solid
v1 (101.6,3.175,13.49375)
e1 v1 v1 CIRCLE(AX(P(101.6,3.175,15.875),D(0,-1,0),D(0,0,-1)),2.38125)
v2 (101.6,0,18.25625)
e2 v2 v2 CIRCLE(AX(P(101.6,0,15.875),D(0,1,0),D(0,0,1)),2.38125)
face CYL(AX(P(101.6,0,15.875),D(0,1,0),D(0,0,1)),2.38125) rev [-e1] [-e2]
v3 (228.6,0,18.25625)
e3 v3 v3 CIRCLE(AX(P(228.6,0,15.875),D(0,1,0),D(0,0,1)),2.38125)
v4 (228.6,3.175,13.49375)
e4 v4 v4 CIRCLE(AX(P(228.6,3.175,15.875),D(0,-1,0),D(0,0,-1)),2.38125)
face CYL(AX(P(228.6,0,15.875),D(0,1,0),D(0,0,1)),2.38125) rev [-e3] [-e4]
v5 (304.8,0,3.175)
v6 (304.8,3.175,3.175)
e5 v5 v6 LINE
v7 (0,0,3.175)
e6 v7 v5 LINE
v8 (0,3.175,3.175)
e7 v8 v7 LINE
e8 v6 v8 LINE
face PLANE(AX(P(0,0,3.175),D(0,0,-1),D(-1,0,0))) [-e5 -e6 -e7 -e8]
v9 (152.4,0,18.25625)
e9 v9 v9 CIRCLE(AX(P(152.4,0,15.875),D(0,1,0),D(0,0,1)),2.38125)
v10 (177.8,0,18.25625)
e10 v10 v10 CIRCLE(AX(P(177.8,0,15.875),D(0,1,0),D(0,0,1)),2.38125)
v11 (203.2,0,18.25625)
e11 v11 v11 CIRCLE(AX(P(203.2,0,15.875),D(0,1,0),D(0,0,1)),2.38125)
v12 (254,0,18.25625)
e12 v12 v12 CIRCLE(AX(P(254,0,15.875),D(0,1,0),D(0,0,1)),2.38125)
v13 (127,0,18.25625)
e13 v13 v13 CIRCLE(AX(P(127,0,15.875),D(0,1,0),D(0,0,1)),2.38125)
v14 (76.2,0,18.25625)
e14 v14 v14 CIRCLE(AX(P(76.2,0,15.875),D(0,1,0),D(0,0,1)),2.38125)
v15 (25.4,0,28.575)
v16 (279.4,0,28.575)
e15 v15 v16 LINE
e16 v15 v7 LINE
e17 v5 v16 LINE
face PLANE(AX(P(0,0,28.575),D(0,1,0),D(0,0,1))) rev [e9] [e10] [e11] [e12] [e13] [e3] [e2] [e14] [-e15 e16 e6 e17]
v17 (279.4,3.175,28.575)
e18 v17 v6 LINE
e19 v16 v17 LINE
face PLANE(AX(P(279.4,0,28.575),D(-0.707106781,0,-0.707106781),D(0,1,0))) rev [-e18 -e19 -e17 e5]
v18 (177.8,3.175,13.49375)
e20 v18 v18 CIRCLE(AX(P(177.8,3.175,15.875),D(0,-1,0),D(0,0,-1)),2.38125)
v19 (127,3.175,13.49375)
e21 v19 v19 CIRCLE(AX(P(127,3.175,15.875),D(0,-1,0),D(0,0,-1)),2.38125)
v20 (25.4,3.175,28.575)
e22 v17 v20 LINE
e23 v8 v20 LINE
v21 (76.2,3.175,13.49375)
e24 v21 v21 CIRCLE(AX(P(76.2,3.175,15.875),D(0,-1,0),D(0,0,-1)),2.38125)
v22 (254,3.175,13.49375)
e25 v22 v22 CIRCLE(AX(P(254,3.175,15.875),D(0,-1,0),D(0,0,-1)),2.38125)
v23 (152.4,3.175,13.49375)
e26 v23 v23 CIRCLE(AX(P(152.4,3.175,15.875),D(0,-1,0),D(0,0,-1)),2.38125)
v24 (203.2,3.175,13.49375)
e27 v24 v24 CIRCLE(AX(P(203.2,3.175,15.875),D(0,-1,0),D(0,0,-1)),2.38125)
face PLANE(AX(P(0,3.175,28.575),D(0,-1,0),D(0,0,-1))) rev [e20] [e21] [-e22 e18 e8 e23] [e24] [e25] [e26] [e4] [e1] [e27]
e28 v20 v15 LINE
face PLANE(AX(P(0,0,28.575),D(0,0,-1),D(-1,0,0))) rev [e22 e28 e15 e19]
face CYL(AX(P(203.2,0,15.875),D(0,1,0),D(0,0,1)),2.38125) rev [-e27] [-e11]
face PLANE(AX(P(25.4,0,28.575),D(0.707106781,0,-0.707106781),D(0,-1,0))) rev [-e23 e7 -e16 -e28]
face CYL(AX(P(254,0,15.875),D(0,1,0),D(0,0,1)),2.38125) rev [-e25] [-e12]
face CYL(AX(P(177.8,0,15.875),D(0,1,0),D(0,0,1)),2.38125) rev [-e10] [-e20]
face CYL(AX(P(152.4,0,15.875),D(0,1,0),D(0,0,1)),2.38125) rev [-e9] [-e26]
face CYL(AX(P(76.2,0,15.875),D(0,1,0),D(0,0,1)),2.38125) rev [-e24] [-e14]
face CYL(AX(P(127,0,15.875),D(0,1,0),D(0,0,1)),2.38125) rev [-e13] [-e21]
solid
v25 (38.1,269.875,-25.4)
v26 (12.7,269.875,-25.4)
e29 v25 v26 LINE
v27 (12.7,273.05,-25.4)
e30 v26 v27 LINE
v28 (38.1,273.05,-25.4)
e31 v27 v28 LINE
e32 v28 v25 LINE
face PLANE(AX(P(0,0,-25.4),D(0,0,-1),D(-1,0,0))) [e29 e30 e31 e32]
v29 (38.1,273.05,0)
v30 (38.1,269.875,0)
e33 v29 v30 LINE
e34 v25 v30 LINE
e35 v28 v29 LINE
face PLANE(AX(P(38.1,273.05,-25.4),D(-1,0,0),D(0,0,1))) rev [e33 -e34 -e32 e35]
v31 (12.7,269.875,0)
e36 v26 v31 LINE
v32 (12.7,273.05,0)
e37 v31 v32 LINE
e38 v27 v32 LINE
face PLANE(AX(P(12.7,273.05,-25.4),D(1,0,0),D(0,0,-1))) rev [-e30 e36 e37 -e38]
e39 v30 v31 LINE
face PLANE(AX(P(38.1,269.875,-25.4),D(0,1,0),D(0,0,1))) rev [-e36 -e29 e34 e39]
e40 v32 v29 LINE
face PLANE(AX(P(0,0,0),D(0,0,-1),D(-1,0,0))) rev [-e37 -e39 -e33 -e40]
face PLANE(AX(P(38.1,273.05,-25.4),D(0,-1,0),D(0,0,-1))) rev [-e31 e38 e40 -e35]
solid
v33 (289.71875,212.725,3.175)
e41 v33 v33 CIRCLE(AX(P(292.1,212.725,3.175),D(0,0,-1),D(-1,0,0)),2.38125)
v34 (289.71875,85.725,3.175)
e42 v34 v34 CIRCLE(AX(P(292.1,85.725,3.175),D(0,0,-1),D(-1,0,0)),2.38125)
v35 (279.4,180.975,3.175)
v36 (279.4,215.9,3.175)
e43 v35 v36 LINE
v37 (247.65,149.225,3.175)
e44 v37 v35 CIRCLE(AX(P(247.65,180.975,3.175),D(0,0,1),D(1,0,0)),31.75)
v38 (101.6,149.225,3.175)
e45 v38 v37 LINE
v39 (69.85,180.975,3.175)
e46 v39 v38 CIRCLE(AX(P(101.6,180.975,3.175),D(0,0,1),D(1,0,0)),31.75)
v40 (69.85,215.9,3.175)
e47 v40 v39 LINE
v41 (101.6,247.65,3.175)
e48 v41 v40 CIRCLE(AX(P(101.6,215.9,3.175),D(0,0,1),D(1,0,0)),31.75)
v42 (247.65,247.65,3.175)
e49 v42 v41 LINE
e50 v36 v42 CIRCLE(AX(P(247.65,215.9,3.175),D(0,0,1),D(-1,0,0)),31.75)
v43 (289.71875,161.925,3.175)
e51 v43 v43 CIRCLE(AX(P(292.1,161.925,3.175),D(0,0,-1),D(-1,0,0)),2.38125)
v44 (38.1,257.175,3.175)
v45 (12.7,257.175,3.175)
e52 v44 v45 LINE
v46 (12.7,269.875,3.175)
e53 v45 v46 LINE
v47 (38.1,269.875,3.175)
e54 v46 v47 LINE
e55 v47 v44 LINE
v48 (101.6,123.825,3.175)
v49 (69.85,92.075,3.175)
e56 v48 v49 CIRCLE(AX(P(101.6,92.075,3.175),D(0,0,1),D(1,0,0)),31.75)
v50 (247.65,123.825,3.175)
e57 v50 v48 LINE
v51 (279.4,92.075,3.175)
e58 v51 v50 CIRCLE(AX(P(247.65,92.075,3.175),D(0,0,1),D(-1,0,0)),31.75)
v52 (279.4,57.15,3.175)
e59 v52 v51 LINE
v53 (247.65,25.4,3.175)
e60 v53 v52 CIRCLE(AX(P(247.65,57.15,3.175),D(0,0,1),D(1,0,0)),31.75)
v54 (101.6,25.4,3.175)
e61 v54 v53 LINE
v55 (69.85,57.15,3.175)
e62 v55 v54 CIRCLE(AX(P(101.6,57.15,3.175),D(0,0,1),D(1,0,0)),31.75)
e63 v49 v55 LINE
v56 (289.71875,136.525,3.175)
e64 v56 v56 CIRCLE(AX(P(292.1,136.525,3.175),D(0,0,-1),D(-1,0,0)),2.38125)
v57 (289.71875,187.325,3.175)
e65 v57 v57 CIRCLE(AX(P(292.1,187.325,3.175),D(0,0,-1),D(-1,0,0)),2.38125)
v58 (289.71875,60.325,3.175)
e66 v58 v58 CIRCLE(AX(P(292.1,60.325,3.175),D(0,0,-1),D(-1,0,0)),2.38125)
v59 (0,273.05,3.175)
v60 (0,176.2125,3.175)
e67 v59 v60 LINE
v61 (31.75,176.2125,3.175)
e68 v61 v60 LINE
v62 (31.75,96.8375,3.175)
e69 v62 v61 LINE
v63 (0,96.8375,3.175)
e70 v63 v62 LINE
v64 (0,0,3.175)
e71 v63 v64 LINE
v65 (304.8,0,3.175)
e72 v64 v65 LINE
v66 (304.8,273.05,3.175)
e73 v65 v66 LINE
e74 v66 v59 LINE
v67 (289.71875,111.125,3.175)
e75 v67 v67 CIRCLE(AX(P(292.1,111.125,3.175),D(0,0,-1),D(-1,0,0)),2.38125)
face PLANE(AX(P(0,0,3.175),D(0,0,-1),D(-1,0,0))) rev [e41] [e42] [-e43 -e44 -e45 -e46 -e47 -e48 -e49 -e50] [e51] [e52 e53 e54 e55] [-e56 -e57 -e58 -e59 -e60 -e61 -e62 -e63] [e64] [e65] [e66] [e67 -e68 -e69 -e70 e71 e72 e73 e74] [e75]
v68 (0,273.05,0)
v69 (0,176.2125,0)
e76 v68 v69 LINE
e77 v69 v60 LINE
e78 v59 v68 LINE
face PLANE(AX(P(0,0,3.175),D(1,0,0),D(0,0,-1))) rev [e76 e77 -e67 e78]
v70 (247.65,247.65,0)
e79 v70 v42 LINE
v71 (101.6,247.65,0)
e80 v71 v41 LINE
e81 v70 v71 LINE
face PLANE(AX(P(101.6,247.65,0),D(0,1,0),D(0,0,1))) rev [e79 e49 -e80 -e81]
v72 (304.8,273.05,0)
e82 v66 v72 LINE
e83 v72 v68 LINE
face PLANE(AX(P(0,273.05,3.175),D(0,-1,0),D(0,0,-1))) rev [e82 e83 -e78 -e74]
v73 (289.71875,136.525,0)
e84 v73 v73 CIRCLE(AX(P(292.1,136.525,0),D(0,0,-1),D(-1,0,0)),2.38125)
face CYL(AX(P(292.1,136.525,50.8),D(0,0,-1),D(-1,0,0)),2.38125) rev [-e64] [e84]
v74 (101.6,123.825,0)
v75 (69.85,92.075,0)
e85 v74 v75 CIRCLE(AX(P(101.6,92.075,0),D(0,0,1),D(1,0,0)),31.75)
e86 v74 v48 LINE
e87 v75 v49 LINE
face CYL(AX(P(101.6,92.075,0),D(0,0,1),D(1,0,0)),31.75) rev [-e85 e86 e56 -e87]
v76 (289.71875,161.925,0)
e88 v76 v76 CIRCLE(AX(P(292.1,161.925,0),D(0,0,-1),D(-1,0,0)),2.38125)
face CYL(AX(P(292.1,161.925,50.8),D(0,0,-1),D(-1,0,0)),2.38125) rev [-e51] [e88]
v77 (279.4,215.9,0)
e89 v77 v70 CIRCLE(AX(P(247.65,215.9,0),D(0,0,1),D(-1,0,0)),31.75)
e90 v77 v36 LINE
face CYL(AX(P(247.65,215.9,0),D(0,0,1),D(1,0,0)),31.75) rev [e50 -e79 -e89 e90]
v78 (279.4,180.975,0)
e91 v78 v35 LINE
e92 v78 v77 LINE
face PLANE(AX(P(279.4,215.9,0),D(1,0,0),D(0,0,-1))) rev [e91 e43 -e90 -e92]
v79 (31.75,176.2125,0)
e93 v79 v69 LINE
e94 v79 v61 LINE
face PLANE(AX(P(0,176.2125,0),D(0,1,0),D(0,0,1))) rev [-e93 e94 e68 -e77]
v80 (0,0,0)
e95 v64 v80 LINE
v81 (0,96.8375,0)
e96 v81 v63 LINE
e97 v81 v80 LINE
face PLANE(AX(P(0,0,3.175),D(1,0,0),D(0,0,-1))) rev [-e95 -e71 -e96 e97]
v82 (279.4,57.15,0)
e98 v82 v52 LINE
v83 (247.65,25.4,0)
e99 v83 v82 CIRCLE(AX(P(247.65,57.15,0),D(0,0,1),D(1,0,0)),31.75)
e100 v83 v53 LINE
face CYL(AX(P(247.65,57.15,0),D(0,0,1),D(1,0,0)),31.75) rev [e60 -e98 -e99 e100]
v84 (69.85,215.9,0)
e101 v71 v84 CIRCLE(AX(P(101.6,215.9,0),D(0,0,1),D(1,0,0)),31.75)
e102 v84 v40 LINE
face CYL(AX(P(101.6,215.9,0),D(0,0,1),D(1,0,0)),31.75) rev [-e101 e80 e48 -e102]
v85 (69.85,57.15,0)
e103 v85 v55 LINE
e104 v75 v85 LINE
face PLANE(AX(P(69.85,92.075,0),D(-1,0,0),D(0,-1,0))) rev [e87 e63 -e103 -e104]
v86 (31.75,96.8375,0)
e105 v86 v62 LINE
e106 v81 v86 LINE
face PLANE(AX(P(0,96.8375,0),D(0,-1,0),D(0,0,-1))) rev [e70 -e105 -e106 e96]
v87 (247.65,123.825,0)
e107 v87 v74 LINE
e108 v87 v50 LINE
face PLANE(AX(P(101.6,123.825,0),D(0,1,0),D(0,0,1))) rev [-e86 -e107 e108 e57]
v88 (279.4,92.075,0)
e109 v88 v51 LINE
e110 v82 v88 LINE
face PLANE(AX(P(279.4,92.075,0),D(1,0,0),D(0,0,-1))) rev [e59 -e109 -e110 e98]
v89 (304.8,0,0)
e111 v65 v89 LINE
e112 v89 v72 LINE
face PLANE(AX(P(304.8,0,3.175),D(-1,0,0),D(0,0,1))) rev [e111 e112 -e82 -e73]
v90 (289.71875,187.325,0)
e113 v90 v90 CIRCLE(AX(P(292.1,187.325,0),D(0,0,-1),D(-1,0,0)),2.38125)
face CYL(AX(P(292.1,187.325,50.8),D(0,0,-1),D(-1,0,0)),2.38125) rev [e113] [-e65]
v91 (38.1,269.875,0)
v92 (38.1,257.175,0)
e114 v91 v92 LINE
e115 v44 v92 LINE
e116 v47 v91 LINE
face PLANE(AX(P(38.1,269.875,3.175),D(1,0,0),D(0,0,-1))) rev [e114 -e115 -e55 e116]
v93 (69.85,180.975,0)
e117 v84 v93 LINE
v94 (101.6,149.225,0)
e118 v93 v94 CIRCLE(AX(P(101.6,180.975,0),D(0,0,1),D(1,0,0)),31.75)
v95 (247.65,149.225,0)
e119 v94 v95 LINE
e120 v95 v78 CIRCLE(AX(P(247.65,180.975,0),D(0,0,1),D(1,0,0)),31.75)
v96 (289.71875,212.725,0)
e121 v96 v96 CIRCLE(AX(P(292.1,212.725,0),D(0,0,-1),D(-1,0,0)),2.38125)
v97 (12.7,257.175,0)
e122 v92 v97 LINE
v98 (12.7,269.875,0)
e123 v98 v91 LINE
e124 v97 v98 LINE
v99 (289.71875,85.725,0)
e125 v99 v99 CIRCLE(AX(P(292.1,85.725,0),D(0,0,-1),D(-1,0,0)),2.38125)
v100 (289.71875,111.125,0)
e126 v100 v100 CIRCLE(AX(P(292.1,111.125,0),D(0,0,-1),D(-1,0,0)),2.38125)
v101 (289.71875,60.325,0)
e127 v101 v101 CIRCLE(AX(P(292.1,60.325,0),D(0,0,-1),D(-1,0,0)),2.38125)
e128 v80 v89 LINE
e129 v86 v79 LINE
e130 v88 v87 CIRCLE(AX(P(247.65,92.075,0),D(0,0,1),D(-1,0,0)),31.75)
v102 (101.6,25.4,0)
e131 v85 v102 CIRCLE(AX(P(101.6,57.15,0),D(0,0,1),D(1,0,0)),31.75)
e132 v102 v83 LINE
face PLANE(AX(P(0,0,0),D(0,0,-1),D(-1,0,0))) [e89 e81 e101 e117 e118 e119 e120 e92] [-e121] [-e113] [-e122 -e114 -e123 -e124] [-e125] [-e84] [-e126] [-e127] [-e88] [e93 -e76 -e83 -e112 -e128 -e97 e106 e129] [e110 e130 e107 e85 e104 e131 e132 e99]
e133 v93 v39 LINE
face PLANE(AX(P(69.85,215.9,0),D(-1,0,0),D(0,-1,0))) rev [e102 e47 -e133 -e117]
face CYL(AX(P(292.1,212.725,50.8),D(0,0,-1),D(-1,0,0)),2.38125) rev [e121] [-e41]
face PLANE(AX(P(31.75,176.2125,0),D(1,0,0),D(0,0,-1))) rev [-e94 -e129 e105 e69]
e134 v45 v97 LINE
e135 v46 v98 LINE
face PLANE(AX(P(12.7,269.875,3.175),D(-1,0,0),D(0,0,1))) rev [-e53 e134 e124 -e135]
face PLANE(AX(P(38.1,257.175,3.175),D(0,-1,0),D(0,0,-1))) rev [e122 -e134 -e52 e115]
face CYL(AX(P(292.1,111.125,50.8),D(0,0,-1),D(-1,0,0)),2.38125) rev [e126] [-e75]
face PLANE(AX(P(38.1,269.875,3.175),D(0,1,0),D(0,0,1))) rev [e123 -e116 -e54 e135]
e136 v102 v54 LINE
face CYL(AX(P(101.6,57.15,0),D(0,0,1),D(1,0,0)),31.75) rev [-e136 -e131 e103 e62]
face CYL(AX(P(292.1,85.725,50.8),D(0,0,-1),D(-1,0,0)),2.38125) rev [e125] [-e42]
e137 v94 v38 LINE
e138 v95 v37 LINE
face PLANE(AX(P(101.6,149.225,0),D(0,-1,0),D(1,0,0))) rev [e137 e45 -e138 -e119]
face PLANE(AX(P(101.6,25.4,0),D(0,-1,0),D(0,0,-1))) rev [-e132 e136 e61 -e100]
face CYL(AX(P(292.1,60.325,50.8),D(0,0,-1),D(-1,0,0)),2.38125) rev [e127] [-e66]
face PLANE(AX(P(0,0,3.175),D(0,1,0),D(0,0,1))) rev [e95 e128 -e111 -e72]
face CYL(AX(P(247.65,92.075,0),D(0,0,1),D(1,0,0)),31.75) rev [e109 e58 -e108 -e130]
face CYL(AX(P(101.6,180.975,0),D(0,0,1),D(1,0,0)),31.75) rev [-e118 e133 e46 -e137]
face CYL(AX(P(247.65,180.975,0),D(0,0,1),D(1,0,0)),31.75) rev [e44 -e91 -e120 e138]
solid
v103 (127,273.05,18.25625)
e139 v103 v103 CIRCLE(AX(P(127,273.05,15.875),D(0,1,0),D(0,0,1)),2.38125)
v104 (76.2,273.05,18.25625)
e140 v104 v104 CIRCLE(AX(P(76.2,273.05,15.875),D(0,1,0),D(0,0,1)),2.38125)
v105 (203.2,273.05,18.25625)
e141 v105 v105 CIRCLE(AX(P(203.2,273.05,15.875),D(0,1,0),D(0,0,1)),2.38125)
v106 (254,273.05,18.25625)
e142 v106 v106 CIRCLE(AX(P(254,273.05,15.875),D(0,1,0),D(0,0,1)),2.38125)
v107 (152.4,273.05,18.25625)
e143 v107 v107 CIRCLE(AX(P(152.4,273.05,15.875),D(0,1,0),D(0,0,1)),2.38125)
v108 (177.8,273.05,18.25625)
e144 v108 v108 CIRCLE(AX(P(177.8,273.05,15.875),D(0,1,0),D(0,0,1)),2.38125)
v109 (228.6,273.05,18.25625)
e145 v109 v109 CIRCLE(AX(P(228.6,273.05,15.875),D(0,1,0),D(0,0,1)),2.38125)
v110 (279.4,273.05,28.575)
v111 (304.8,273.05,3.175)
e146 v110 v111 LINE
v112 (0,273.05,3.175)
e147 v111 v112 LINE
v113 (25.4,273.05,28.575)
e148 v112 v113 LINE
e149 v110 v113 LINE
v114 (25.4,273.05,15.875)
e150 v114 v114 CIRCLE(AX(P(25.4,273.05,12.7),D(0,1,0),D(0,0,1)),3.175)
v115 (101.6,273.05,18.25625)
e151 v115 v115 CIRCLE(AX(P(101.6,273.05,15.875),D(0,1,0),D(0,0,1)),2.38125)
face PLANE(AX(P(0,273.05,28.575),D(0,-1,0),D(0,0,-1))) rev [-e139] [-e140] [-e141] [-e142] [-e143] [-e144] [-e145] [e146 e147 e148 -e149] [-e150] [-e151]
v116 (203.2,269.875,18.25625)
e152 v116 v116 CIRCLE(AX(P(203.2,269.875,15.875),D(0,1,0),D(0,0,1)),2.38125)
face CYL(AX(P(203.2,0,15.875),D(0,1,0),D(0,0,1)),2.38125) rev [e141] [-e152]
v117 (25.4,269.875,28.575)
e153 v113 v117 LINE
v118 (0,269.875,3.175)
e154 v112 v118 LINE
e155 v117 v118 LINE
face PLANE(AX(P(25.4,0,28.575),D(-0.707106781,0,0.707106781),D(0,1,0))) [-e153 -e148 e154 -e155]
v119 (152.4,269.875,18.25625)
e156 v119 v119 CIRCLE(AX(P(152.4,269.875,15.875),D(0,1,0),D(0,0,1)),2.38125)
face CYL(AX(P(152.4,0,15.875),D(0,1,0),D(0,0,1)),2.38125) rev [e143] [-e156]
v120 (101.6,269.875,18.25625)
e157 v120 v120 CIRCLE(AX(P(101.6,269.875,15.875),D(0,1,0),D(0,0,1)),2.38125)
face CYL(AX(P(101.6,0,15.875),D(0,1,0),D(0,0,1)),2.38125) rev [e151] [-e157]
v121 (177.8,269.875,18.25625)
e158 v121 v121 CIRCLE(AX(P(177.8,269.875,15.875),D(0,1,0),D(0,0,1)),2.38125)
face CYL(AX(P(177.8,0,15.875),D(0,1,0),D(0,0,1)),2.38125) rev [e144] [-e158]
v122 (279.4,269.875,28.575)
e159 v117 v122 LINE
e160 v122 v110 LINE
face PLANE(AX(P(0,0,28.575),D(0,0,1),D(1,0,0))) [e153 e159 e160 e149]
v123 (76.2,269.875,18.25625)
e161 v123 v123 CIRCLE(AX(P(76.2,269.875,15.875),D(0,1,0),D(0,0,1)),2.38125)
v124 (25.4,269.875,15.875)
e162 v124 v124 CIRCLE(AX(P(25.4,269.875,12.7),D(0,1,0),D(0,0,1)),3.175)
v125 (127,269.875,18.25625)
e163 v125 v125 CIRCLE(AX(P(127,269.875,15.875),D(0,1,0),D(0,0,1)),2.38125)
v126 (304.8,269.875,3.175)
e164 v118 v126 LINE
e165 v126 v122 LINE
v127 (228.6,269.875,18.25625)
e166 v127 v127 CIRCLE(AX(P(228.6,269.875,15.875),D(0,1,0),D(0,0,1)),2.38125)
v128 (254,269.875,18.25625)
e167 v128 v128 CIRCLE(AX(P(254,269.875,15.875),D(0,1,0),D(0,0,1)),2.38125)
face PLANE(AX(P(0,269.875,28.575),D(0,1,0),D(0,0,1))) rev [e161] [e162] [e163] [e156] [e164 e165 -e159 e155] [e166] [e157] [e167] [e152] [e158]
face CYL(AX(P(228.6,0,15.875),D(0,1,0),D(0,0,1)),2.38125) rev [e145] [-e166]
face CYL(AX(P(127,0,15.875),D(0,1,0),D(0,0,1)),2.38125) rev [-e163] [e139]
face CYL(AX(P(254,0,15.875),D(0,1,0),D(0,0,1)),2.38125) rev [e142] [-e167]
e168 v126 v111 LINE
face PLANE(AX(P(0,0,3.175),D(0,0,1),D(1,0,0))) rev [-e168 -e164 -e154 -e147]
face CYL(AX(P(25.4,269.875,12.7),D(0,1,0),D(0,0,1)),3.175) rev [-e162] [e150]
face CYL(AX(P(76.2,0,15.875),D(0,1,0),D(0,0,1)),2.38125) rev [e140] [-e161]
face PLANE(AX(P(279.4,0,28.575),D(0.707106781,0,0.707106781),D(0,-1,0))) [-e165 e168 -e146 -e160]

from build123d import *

# Parameters (mm, degrees)
SKETCH1_W           = 304.8
SKETCH1_H           = 273.05
BOSS_EXTRUDE1_DEPTH = 3.175
SKETCH2_W           = 31.75
SKETCH2_H           = 79.375
CUT_EXTRUDE1_DEPTH  = 3.175
SKETCH5_W           = 304.8
SKETCH5_H           = 3.175
BASE_FLANGE1_DEPTH  = 25.4
CHAMFER1_SIZE       = 25.4
SKETCH10_W          = 304.8
SKETCH10_H          = 3.175
BASE_FLANGE2_DEPTH  = 25.4
CHAMFER2_SIZE       = 25.4
SKETCH13_R          = 3.175
CUT_EXTRUDE4_DEPTH  = 3.175
SKETCH14_W          = 25.4
SKETCH14_H          = 3.175
BASE_FLANGE3_DEPTH  = 25.4
SKETCH18_W          = 25.4
SKETCH18_H          = 12.7
CUT_EXTRUDE5_DEPTH  = 3.175
SKETCH19_R          = 2.38125
CUT_EXTRUDE7_DEPTH  = 411.214423351
SKETCH20_R          = 2.38125
CUT_EXTRUDE8_DEPTH  = 50.8


# Sheet-metal steps are written as plain solids
with BuildPart() as part:
    # Sketch1 → Boss-Extrude1 (new body)
    with BuildSketch(Plane.XY):
        with Locations((152.4, 136.525)):
            Rectangle(SKETCH1_W, SKETCH1_H)
    extrude(amount=BOSS_EXTRUDE1_DEPTH)

    # Sketch2 → Cut-Extrude1 (cut)
    with BuildSketch(Plane.XY.offset(3.175)):
        with BuildLine():
            Line((101.6, 247.65), (247.65, 247.65))
            ThreePointArc((247.65, 247.65), (270.100640303, 238.350640303), (279.4, 215.9))
            Line((279.4, 215.9), (279.4, 180.975))
            ThreePointArc((279.4, 180.975), (270.100640303, 158.524359697), (247.65, 149.225))
            Line((247.65, 149.225), (101.6, 149.225))
            ThreePointArc((101.6, 149.225), (79.149359697, 158.524359697), (69.85, 180.975))
            Line((69.85, 180.975), (69.85, 215.9))
            ThreePointArc((69.85, 215.9), (79.149359697, 238.350640303), (101.6, 247.65))
        make_face()
        with BuildLine():
            Line((101.6, 123.825), (247.65, 123.825))
            ThreePointArc((247.65, 123.825), (270.100640303, 114.525640303), (279.4, 92.075))
            Line((279.4, 92.075), (279.4, 57.15))
            ThreePointArc((279.4, 57.15), (270.100640303, 34.699359697), (247.65, 25.4))
            Line((247.65, 25.4), (101.6, 25.4))
            ThreePointArc((101.6, 25.4), (79.149359697, 34.699359697), (69.85, 57.15))
            Line((69.85, 57.15), (69.85, 92.075))
            ThreePointArc((69.85, 92.075), (79.149359697, 114.525640303), (101.6, 123.825))
        make_face()
        with Locations((15.875, 136.525)):
            Rectangle(SKETCH2_W, SKETCH2_H)
    extrude(amount=-CUT_EXTRUDE1_DEPTH, mode=Mode.SUBTRACT)

    # Sketch18 → Cut-Extrude5 (cut)
    with BuildSketch(Plane(origin=(0, 0, 0), x_dir=(-1, 0, 0), z_dir=(0, 0, -1))):
        with Locations((-25.4, 263.525)):
            Rectangle(SKETCH18_W, SKETCH18_H)
    extrude(amount=-CUT_EXTRUDE5_DEPTH, mode=Mode.SUBTRACT)

    # Sketch20 → Cut-Extrude8 (cut)
    with BuildSketch(Plane(origin=(0, 0, 0), x_dir=(-1, 0, 0), z_dir=(0, 0, -1))):
        with Locations((-292.1, 136.525)):
            Circle(SKETCH20_R)
        with Locations((-292.1, 161.925)):
            Circle(SKETCH20_R)
        with Locations((-292.1, 187.325)):
            Circle(SKETCH20_R)
        with Locations((-292.1, 212.725)):
            Circle(SKETCH20_R)
        with Locations((-292.1, 111.125)):
            Circle(SKETCH20_R)
        with Locations((-292.1, 85.725)):
            Circle(SKETCH20_R)
        with Locations((-292.1, 60.325)):
            Circle(SKETCH20_R)
    extrude(amount=-CUT_EXTRUDE8_DEPTH, mode=Mode.SUBTRACT)


with BuildPart() as body_2:
    # Sketch5 → Base-Flange1 (new body)
    with BuildSketch(Plane.XY.offset(3.175)):
        with Locations((152.4, 271.4625)):
            Rectangle(SKETCH5_W, SKETCH5_H)
    extrude(amount=BASE_FLANGE1_DEPTH)

    # Chamfer1
    chamfer1_edges = [body_2.edges().sort_by_distance(p)[0] for p in [
        (0, 271.4625, 28.575),
        (304.8, 271.4625, 28.575),
    ]]
    chamfer(chamfer1_edges, length=CHAMFER1_SIZE - 0.0001)  # a hair under: the kernel refuses the full size

    # Sketch13 → Cut-Extrude4 (cut)
    with BuildSketch(Plane(origin=(0, 273.05, 0), x_dir=(1, 0, 0), z_dir=(0, 1, 0))):
        with Locations(Location((25.4, -12.7, 0), (0, 0, 270))):
            Circle(SKETCH13_R)
    extrude(amount=-CUT_EXTRUDE4_DEPTH, mode=Mode.SUBTRACT)


with BuildPart() as body_3:
    # Sketch10 → Base-Flange2 (new body)
    with BuildSketch(Plane.XY.offset(3.175)):
        with Locations((152.4, 1.5875)):
            Rectangle(SKETCH10_W, SKETCH10_H)
    extrude(amount=BASE_FLANGE2_DEPTH)

    # Chamfer2
    chamfer2_edges = [body_3.edges().sort_by_distance(p)[0] for p in [
        (0, 1.5875, 28.575),
        (304.8, 1.5875, 28.575),
    ]]
    chamfer(chamfer2_edges, length=CHAMFER2_SIZE - 0.0001)  # a hair under: the kernel refuses the full size


with BuildPart() as body_4:
    # Sketch14 → Base-Flange3 (new body)
    with BuildSketch(Plane(origin=(0, 0, 0), x_dir=(-1, 0, 0), z_dir=(0, 0, -1))):
        with Locations((-25.4, 271.4625)):
            Rectangle(SKETCH14_W, SKETCH14_H)
    extrude(amount=BASE_FLANGE3_DEPTH)


with BuildPart() as cut_extrude7_tool:
    # Sketch19 → Cut-Extrude7 (new, through all)
    with BuildSketch(Plane(origin=(0, 273.05, 0), x_dir=(1, 0, 0), z_dir=(0, 1, 0))):
        with Locations(Location((76.2, -15.875, 0), (0, 0, 270))):
            Circle(SKETCH19_R)
        with Locations(Location((101.6, -15.875, 0), (0, 0, 270))):
            Circle(SKETCH19_R)
        with Locations(Location((127, -15.875, 0), (0, 0, 270))):
            Circle(SKETCH19_R)
        with Locations(Location((152.4, -15.875, 0), (0, 0, 270))):
            Circle(SKETCH19_R)
        with Locations(Location((177.8, -15.875, 0), (0, 0, 270))):
            Circle(SKETCH19_R)
        with Locations(Location((203.2, -15.875, 0), (0, 0, 270))):
            Circle(SKETCH19_R)
        with Locations(Location((228.6, -15.875, 0), (0, 0, 270))):
            Circle(SKETCH19_R)
        with Locations(Location((254, -15.875, 0), (0, 0, 270))):
            Circle(SKETCH19_R)
    extrude(amount=-CUT_EXTRUDE7_DEPTH)


with BuildPart() as body_2_1:
    add(body_2.part)

    # Cut-Extrude7: cut by cut_extrude7_tool
    add(cut_extrude7_tool.part, mode=Mode.SUBTRACT)


with BuildPart() as body_3_1:
    add(body_3.part)

    # Cut-Extrude7: cut by cut_extrude7_tool
    add(cut_extrude7_tool.part, mode=Mode.SUBTRACT)


solid = Compound([part.part, body_4.part, body_2_1.part, body_3_1.part])
